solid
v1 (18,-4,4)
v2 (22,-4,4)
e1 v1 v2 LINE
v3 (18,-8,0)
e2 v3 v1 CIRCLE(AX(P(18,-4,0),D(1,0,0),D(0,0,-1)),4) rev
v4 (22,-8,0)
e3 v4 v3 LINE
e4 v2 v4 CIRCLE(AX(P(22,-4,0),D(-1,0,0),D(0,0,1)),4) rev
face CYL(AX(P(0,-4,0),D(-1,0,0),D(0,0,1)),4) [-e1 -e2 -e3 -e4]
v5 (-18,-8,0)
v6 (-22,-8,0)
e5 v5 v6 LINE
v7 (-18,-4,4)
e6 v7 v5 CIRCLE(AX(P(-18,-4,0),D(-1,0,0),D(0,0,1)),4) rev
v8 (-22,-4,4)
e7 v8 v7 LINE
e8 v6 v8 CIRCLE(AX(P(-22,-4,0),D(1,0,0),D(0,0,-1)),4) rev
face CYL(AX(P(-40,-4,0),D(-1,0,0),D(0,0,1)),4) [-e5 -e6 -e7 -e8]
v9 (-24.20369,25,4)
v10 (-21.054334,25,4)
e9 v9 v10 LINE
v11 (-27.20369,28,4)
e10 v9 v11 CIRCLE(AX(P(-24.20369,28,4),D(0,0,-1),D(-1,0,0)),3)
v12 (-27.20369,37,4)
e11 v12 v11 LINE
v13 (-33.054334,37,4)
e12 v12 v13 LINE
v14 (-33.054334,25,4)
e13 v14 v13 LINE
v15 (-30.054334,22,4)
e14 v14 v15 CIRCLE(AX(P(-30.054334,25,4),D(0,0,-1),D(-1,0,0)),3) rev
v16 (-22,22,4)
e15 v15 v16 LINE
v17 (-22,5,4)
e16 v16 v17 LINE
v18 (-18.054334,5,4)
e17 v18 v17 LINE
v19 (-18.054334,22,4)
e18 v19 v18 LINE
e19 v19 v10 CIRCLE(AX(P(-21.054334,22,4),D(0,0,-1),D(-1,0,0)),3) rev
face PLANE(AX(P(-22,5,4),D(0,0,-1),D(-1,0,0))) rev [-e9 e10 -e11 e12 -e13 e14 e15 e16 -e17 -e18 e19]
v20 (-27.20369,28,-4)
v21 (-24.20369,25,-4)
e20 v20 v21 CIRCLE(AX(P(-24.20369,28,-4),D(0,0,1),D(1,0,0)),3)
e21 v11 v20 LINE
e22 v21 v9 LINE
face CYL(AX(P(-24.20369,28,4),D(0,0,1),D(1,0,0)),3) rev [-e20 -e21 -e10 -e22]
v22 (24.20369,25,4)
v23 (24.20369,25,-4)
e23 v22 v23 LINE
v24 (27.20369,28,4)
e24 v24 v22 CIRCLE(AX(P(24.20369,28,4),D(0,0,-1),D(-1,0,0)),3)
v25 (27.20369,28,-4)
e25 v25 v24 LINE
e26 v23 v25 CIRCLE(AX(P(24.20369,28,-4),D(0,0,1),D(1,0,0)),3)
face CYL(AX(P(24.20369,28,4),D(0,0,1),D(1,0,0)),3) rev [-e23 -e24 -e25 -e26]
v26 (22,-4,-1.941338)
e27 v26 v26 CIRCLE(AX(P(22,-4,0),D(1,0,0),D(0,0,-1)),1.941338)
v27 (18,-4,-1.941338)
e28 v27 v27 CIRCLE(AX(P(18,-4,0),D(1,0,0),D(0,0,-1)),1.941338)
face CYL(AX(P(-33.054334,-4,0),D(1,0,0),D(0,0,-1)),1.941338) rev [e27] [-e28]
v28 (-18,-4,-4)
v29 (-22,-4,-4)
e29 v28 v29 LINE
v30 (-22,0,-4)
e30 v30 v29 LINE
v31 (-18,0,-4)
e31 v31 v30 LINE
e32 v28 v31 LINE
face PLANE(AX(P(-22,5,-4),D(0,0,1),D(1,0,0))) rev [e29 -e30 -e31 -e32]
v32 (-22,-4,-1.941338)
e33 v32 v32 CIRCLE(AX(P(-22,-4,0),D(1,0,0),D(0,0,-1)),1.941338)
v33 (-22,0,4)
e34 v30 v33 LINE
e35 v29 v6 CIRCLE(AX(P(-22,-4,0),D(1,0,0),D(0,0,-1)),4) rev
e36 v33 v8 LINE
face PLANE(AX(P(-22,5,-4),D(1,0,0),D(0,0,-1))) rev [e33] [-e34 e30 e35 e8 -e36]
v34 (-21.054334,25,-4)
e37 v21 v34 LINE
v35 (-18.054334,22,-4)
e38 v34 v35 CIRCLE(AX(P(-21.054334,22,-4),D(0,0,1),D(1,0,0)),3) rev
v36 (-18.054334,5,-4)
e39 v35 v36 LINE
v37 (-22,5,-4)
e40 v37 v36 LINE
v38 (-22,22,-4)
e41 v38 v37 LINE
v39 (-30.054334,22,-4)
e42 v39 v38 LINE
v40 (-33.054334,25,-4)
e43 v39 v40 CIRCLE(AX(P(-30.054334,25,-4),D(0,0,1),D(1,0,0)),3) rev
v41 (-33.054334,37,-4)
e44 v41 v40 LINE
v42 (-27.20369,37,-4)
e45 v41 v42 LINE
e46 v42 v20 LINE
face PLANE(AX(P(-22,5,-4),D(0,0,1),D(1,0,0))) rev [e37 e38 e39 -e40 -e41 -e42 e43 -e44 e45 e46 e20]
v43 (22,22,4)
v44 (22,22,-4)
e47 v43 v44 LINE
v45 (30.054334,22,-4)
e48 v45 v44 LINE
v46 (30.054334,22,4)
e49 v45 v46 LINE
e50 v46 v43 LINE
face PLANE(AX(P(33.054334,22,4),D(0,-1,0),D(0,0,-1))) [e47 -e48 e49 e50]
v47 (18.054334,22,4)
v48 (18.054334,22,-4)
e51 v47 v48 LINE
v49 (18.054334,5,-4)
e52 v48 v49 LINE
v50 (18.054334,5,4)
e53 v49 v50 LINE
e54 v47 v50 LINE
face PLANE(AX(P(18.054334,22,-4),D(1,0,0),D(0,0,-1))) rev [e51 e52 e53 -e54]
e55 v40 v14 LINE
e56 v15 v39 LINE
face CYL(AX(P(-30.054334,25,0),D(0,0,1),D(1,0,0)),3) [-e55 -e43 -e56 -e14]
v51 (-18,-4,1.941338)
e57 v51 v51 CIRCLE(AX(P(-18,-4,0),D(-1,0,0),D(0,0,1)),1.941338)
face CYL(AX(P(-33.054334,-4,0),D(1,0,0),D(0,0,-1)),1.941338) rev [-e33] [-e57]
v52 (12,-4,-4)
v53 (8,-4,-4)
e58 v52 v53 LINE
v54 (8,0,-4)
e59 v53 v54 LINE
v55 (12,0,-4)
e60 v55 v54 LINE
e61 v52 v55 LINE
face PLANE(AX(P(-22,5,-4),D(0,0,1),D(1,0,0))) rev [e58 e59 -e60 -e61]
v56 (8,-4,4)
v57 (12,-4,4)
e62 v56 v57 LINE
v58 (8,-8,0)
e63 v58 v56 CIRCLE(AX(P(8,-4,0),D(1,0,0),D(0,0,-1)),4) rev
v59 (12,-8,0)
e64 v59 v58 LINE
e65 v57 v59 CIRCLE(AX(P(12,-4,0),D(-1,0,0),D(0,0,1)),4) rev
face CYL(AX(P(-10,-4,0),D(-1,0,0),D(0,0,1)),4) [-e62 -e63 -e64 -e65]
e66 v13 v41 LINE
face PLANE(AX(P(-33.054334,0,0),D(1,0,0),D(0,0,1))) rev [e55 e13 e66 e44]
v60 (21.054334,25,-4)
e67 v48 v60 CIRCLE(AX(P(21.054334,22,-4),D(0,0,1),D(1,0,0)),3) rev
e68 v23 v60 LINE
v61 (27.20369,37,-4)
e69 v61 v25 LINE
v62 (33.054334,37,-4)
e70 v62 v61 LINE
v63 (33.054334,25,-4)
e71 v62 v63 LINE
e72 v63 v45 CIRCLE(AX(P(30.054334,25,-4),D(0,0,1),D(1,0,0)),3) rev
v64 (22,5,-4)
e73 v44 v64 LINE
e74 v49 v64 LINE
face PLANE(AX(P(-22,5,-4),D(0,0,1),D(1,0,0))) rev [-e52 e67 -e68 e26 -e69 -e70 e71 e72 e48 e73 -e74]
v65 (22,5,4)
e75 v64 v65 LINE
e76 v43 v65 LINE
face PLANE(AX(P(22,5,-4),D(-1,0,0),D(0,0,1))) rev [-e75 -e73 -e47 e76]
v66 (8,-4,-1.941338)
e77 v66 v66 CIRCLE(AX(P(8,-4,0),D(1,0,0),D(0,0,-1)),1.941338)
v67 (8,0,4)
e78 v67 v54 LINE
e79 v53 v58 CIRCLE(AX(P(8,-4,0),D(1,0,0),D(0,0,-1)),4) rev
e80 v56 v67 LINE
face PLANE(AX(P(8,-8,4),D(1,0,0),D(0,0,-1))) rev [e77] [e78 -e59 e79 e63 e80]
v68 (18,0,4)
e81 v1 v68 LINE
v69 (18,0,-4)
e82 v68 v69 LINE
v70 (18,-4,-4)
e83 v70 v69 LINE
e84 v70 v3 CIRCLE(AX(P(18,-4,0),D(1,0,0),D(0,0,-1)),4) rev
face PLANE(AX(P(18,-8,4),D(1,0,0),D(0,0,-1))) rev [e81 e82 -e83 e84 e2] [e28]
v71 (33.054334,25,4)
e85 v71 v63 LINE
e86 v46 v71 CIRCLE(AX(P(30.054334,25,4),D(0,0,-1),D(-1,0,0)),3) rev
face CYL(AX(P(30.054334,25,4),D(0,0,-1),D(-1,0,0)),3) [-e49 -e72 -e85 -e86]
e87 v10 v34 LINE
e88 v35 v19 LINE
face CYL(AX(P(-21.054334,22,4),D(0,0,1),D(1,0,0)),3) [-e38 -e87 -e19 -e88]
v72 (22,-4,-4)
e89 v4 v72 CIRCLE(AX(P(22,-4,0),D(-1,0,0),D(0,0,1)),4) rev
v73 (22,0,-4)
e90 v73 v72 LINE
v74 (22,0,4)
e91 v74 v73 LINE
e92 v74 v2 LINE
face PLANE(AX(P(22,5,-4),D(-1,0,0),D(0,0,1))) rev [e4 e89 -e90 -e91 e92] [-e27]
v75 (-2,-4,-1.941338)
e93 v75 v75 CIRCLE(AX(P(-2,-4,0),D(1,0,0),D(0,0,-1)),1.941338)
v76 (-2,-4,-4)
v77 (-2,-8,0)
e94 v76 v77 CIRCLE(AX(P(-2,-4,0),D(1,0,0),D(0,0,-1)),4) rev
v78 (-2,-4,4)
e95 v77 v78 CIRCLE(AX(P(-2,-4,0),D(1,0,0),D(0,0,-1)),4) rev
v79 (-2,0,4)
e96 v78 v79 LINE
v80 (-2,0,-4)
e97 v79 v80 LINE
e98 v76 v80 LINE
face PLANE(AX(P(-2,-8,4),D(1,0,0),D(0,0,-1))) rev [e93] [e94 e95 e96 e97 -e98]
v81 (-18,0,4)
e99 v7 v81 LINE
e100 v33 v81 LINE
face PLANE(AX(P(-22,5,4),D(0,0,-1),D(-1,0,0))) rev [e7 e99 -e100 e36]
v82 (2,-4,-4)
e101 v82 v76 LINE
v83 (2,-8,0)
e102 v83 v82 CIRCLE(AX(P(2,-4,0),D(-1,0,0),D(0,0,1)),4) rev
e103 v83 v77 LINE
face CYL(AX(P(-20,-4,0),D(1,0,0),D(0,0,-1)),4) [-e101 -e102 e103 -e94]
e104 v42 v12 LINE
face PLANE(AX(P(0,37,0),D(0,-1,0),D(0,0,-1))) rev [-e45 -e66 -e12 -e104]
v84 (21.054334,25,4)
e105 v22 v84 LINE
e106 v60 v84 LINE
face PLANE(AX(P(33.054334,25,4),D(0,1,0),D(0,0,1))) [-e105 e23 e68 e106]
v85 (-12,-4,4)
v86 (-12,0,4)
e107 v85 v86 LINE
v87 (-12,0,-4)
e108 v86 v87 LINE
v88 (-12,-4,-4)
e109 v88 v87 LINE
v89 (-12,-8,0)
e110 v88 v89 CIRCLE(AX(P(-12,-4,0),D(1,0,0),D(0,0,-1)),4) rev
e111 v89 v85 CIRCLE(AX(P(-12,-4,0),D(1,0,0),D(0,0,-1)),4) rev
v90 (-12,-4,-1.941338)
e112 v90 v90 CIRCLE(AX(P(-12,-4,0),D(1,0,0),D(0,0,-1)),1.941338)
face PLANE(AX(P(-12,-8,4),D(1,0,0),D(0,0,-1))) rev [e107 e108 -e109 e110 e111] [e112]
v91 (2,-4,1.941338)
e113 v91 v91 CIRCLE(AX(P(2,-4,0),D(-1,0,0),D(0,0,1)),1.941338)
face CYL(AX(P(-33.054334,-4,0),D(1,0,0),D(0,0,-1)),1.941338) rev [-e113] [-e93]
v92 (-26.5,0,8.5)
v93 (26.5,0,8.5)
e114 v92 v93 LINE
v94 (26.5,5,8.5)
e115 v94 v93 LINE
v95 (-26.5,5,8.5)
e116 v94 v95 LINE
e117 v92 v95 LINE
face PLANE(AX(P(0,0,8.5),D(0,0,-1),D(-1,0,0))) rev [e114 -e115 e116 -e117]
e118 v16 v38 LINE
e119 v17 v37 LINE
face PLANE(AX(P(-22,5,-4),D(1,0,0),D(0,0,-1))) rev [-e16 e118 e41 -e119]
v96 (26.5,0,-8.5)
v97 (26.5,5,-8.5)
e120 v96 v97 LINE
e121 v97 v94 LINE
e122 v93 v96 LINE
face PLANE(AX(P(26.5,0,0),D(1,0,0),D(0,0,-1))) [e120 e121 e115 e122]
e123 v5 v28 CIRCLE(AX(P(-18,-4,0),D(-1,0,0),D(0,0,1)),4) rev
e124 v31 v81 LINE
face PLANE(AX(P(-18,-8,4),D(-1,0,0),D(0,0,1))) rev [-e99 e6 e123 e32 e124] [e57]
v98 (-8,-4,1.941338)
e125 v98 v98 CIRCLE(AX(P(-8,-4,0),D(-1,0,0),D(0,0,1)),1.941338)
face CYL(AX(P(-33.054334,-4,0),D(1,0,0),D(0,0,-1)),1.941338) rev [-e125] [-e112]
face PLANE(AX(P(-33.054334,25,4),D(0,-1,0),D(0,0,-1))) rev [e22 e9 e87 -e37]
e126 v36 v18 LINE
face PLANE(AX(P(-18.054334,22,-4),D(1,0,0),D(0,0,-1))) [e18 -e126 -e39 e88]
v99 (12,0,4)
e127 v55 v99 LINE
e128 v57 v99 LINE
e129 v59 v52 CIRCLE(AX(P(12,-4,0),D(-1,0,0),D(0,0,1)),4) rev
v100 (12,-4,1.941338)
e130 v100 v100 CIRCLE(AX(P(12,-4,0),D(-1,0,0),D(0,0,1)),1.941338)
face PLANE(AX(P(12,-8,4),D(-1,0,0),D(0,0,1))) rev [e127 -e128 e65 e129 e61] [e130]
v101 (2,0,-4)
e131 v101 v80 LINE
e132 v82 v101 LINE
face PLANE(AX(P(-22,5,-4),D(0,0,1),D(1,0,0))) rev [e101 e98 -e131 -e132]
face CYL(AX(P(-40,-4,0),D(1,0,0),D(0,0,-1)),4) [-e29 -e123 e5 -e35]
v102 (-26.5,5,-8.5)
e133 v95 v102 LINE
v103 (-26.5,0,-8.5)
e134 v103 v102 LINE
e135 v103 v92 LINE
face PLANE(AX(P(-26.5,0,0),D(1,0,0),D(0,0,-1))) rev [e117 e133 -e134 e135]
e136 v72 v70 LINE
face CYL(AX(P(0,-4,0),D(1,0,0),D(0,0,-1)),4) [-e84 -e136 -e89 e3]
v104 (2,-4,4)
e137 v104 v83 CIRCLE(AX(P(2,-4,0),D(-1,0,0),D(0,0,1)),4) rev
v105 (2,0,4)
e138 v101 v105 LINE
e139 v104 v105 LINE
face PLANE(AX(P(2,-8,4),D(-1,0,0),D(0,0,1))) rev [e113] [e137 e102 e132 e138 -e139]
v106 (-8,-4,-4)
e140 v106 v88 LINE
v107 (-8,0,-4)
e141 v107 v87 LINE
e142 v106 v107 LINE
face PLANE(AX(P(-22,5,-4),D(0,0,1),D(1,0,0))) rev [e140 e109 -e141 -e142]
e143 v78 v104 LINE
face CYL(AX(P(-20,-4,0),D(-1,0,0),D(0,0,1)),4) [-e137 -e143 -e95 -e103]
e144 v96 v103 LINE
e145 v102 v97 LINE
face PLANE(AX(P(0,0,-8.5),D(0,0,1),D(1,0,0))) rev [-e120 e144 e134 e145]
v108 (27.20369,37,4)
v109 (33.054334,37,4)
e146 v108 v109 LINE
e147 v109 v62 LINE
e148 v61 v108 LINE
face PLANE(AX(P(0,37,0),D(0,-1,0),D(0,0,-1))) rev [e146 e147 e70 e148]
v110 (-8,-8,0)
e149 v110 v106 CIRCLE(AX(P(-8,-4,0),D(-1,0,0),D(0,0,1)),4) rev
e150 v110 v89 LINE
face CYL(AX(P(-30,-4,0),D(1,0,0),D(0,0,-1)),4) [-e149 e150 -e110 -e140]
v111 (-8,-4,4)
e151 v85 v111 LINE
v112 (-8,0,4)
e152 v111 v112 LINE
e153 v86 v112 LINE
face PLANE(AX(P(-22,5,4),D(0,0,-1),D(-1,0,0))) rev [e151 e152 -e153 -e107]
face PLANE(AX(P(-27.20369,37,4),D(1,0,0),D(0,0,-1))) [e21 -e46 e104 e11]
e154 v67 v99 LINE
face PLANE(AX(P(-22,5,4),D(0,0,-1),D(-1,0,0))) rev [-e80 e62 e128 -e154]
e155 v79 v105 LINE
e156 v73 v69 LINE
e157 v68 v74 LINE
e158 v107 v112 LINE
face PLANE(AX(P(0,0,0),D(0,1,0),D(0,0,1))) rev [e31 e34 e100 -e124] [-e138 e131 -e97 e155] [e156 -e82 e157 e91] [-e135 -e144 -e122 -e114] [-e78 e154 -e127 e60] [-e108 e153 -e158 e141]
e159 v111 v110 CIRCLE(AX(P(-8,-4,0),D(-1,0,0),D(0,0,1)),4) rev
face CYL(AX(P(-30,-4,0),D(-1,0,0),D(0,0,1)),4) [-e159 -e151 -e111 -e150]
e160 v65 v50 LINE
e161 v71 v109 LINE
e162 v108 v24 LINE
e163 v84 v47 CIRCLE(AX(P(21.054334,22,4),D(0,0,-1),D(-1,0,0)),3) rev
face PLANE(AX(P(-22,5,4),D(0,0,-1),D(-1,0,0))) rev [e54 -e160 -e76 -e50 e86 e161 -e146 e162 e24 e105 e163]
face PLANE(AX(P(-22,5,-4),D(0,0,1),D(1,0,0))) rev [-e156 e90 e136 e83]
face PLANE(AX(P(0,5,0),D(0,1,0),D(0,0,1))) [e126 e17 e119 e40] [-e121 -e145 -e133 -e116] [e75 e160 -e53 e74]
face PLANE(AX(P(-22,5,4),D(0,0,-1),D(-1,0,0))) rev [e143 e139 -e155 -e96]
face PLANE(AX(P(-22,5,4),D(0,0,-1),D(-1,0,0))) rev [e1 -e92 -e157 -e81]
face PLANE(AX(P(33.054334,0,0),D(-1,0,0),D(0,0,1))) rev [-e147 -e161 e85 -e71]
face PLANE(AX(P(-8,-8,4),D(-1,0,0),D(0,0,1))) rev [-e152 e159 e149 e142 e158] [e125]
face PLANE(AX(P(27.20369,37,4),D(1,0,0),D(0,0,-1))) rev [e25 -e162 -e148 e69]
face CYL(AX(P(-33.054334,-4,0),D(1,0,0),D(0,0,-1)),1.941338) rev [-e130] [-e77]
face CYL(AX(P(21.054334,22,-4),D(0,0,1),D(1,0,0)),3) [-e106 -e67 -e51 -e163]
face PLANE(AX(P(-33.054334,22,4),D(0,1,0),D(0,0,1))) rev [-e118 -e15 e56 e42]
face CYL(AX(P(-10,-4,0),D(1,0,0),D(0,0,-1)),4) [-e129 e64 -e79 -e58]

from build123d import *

# Parameters (mm, degrees)
SKETCH1_W              = 44
SKETCH1_H              = 8
BOSS_EXTRUDE1_DEPTH    = 5
SKETCH2_W              = 3.945665761
SKETCH2_H              = 8
BOSS_EXTRUDE2_DEPTH    = 17
SKETCH3_W              = 8
SKETCH3_H              = 3
BOSS_EXTRUDE3_DEPTH    = 15
SKETCH4_W              = 5.850643969
SKETCH4_H              = 8
BOSS_EXTRUDE4_DEPTH    = 12
SKETCH5_W              = 4
SKETCH5_H              = 8
BOSS_EXTRUDE5_DEPTH    = 8
FILLET2_R              = 4
LPATTERN1_COUNT        = 5
LPATTERN1_PITCH        = 10
FILLET2_OF_LPATTERN1_R = 4
SKETCH6_R              = 1.941337646
CUT_EXTRUDE1_DEPTH     = 67.452838302
SKETCH7_W              = 44
SKETCH7_H              = 5
BOSS_EXTRUDE6_DEPTH    = 4.5
SKETCH8_W              = 12.5
SKETCH8_H              = 5
BOSS_EXTRUDE7_DEPTH    = 4.5
SKETCH9_W              = 48.5
SKETCH9_H              = 5
BOSS_EXTRUDE8_DEPTH    = 4.5
SKETCH10_W             = 17
SKETCH10_H             = 5
BOSS_EXTRUDE9_DEPTH    = 4.5
FILLET4_R              = 3


with BuildPart() as part:
    # Sketch1 → Boss-Extrude1 (new body)
    with BuildSketch(Plane(origin=(0, 0, 0), x_dir=(1, 0, 0), z_dir=(0, 1, 0))):
        Rectangle(SKETCH1_W, SKETCH1_H)
    extrude(amount=BOSS_EXTRUDE1_DEPTH)

    # Sketch2 → Boss-Extrude2 (add)
    with BuildSketch(Plane(origin=(0, 5, 0), x_dir=(1, 0, 0), z_dir=(0, 1, 0))):
        with Locations((20.027167119, 0)):
            Rectangle(SKETCH2_W, SKETCH2_H)
    boss_extrude2 = extrude(amount=BOSS_EXTRUDE2_DEPTH)

    # Sketch3 → Boss-Extrude3 (add)
    with BuildSketch(Plane.ZY.offset(-18.054334239)):
        with Locations((0, 23.5)):
            Rectangle(SKETCH3_W, SKETCH3_H)
    boss_extrude3 = extrude(amount=-BOSS_EXTRUDE3_DEPTH)

    # Sketch4 → Boss-Extrude4 (add)
    with BuildSketch(Plane(origin=(0, 25, 0), x_dir=(1, 0, 0), z_dir=(0, 1, 0))):
        with Locations((30.129012255, 0)):
            Rectangle(SKETCH4_W, SKETCH4_H)
    boss_extrude4 = extrude(amount=BOSS_EXTRUDE4_DEPTH)

    # Mirror1: Boss-Extrude2, Boss-Extrude3, Boss-Extrude4 across plane
    add(boss_extrude2.mirror(Plane(origin=(0, 0, 0), x_dir=(0, 0, 1), z_dir=(1, 0, 0))))
    add(boss_extrude3.mirror(Plane(origin=(0, 0, 0), x_dir=(0, 0, 1), z_dir=(1, 0, 0))))
    add(boss_extrude4.mirror(Plane(origin=(0, 0, 0), x_dir=(0, 0, 1), z_dir=(1, 0, 0))))

    # Sketch5 → Boss-Extrude5 (add)
    with BuildSketch(Plane.XZ):
        with Locations((20, 0)):
            Rectangle(SKETCH5_W, SKETCH5_H)
    boss_extrude5 = extrude(amount=BOSS_EXTRUDE5_DEPTH)

    # Fillet2
    fillet2_edges = [part.edges().sort_by_distance(p)[0] for p in [
        (20, -8, -4),
        (20, -8, 4),
    ]]
    fillet(fillet2_edges, radius=FILLET2_R - 0.0001)  # a hair under: the kernel refuses the full size

    # LPattern1: Boss-Extrude5 ×5
    with Locations(*[(-i * LPATTERN1_PITCH, 0, 0) for i in range(1, LPATTERN1_COUNT)]):
        add(boss_extrude5)

    # Fillet2 of LPattern1
    fillet2_of_lpattern1_edges = [part.edges().sort_by_distance(p)[0] for p in [
        (10, -8, -4),
        (10, -8, 4),
        (0, -8, -4),
        (0, -8, 4),
        (-10, -8, -4),
        (-10, -8, 4),
        (-20, -8, -4),
        (-20, -8, 4),
    ]]
    fillet(fillet2_of_lpattern1_edges, radius=FILLET2_OF_LPATTERN1_R - 0.0001)  # a hair under: the kernel refuses the full size

    # Sketch6 → Cut-Extrude1 (cut, through all)
    with BuildSketch(Plane(origin=(22, 0, 0), x_dir=(0, 0, -1), z_dir=(1, 0, 0))):
        with Locations((0, -4)):
            Circle(SKETCH6_R)
    extrude(amount=-CUT_EXTRUDE1_DEPTH, mode=Mode.SUBTRACT)

    # Sketch7 → Boss-Extrude6 (add)
    with BuildSketch(Plane.XY.offset(4)):
        with Locations((0, 2.5)):
            Rectangle(SKETCH7_W, SKETCH7_H)
    extrude(amount=BOSS_EXTRUDE6_DEPTH)

    # Sketch8 → Boss-Extrude7 (add)
    with BuildSketch(Plane.ZY.offset(22)):
        with Locations((2.25, 2.5)):
            Rectangle(SKETCH8_W, SKETCH8_H)
    extrude(amount=BOSS_EXTRUDE7_DEPTH)

    # Sketch9 → Boss-Extrude8 (add)
    with BuildSketch(Plane(origin=(0, 0, -4), x_dir=(-1, 0, 0), z_dir=(0, 0, -1))):
        with Locations((2.25, 2.5)):
            Rectangle(SKETCH9_W, SKETCH9_H)
    extrude(amount=BOSS_EXTRUDE8_DEPTH)

    # Sketch10 → Boss-Extrude9 (add)
    with BuildSketch(Plane(origin=(22, 0, 0), x_dir=(0, 0, -1), z_dir=(1, 0, 0))):
        with Locations((0, 2.5)):
            Rectangle(SKETCH10_W, SKETCH10_H)
    extrude(amount=BOSS_EXTRUDE9_DEPTH)

    # Fillet4
    fillet4_edges = [part.edges().sort_by_distance(p)[0] for p in [
        (33.054334239, 22, 0),
        (18.054334239, 25, 0),
        (27.20369027, 25, 0),
        (-18.054334239, 25, 0),
        (-33.054334239, 22, 0),
        (-27.20369027, 25, 0),
    ]]
    fillet(fillet4_edges, radius=FILLET4_R)


solid = part.part
